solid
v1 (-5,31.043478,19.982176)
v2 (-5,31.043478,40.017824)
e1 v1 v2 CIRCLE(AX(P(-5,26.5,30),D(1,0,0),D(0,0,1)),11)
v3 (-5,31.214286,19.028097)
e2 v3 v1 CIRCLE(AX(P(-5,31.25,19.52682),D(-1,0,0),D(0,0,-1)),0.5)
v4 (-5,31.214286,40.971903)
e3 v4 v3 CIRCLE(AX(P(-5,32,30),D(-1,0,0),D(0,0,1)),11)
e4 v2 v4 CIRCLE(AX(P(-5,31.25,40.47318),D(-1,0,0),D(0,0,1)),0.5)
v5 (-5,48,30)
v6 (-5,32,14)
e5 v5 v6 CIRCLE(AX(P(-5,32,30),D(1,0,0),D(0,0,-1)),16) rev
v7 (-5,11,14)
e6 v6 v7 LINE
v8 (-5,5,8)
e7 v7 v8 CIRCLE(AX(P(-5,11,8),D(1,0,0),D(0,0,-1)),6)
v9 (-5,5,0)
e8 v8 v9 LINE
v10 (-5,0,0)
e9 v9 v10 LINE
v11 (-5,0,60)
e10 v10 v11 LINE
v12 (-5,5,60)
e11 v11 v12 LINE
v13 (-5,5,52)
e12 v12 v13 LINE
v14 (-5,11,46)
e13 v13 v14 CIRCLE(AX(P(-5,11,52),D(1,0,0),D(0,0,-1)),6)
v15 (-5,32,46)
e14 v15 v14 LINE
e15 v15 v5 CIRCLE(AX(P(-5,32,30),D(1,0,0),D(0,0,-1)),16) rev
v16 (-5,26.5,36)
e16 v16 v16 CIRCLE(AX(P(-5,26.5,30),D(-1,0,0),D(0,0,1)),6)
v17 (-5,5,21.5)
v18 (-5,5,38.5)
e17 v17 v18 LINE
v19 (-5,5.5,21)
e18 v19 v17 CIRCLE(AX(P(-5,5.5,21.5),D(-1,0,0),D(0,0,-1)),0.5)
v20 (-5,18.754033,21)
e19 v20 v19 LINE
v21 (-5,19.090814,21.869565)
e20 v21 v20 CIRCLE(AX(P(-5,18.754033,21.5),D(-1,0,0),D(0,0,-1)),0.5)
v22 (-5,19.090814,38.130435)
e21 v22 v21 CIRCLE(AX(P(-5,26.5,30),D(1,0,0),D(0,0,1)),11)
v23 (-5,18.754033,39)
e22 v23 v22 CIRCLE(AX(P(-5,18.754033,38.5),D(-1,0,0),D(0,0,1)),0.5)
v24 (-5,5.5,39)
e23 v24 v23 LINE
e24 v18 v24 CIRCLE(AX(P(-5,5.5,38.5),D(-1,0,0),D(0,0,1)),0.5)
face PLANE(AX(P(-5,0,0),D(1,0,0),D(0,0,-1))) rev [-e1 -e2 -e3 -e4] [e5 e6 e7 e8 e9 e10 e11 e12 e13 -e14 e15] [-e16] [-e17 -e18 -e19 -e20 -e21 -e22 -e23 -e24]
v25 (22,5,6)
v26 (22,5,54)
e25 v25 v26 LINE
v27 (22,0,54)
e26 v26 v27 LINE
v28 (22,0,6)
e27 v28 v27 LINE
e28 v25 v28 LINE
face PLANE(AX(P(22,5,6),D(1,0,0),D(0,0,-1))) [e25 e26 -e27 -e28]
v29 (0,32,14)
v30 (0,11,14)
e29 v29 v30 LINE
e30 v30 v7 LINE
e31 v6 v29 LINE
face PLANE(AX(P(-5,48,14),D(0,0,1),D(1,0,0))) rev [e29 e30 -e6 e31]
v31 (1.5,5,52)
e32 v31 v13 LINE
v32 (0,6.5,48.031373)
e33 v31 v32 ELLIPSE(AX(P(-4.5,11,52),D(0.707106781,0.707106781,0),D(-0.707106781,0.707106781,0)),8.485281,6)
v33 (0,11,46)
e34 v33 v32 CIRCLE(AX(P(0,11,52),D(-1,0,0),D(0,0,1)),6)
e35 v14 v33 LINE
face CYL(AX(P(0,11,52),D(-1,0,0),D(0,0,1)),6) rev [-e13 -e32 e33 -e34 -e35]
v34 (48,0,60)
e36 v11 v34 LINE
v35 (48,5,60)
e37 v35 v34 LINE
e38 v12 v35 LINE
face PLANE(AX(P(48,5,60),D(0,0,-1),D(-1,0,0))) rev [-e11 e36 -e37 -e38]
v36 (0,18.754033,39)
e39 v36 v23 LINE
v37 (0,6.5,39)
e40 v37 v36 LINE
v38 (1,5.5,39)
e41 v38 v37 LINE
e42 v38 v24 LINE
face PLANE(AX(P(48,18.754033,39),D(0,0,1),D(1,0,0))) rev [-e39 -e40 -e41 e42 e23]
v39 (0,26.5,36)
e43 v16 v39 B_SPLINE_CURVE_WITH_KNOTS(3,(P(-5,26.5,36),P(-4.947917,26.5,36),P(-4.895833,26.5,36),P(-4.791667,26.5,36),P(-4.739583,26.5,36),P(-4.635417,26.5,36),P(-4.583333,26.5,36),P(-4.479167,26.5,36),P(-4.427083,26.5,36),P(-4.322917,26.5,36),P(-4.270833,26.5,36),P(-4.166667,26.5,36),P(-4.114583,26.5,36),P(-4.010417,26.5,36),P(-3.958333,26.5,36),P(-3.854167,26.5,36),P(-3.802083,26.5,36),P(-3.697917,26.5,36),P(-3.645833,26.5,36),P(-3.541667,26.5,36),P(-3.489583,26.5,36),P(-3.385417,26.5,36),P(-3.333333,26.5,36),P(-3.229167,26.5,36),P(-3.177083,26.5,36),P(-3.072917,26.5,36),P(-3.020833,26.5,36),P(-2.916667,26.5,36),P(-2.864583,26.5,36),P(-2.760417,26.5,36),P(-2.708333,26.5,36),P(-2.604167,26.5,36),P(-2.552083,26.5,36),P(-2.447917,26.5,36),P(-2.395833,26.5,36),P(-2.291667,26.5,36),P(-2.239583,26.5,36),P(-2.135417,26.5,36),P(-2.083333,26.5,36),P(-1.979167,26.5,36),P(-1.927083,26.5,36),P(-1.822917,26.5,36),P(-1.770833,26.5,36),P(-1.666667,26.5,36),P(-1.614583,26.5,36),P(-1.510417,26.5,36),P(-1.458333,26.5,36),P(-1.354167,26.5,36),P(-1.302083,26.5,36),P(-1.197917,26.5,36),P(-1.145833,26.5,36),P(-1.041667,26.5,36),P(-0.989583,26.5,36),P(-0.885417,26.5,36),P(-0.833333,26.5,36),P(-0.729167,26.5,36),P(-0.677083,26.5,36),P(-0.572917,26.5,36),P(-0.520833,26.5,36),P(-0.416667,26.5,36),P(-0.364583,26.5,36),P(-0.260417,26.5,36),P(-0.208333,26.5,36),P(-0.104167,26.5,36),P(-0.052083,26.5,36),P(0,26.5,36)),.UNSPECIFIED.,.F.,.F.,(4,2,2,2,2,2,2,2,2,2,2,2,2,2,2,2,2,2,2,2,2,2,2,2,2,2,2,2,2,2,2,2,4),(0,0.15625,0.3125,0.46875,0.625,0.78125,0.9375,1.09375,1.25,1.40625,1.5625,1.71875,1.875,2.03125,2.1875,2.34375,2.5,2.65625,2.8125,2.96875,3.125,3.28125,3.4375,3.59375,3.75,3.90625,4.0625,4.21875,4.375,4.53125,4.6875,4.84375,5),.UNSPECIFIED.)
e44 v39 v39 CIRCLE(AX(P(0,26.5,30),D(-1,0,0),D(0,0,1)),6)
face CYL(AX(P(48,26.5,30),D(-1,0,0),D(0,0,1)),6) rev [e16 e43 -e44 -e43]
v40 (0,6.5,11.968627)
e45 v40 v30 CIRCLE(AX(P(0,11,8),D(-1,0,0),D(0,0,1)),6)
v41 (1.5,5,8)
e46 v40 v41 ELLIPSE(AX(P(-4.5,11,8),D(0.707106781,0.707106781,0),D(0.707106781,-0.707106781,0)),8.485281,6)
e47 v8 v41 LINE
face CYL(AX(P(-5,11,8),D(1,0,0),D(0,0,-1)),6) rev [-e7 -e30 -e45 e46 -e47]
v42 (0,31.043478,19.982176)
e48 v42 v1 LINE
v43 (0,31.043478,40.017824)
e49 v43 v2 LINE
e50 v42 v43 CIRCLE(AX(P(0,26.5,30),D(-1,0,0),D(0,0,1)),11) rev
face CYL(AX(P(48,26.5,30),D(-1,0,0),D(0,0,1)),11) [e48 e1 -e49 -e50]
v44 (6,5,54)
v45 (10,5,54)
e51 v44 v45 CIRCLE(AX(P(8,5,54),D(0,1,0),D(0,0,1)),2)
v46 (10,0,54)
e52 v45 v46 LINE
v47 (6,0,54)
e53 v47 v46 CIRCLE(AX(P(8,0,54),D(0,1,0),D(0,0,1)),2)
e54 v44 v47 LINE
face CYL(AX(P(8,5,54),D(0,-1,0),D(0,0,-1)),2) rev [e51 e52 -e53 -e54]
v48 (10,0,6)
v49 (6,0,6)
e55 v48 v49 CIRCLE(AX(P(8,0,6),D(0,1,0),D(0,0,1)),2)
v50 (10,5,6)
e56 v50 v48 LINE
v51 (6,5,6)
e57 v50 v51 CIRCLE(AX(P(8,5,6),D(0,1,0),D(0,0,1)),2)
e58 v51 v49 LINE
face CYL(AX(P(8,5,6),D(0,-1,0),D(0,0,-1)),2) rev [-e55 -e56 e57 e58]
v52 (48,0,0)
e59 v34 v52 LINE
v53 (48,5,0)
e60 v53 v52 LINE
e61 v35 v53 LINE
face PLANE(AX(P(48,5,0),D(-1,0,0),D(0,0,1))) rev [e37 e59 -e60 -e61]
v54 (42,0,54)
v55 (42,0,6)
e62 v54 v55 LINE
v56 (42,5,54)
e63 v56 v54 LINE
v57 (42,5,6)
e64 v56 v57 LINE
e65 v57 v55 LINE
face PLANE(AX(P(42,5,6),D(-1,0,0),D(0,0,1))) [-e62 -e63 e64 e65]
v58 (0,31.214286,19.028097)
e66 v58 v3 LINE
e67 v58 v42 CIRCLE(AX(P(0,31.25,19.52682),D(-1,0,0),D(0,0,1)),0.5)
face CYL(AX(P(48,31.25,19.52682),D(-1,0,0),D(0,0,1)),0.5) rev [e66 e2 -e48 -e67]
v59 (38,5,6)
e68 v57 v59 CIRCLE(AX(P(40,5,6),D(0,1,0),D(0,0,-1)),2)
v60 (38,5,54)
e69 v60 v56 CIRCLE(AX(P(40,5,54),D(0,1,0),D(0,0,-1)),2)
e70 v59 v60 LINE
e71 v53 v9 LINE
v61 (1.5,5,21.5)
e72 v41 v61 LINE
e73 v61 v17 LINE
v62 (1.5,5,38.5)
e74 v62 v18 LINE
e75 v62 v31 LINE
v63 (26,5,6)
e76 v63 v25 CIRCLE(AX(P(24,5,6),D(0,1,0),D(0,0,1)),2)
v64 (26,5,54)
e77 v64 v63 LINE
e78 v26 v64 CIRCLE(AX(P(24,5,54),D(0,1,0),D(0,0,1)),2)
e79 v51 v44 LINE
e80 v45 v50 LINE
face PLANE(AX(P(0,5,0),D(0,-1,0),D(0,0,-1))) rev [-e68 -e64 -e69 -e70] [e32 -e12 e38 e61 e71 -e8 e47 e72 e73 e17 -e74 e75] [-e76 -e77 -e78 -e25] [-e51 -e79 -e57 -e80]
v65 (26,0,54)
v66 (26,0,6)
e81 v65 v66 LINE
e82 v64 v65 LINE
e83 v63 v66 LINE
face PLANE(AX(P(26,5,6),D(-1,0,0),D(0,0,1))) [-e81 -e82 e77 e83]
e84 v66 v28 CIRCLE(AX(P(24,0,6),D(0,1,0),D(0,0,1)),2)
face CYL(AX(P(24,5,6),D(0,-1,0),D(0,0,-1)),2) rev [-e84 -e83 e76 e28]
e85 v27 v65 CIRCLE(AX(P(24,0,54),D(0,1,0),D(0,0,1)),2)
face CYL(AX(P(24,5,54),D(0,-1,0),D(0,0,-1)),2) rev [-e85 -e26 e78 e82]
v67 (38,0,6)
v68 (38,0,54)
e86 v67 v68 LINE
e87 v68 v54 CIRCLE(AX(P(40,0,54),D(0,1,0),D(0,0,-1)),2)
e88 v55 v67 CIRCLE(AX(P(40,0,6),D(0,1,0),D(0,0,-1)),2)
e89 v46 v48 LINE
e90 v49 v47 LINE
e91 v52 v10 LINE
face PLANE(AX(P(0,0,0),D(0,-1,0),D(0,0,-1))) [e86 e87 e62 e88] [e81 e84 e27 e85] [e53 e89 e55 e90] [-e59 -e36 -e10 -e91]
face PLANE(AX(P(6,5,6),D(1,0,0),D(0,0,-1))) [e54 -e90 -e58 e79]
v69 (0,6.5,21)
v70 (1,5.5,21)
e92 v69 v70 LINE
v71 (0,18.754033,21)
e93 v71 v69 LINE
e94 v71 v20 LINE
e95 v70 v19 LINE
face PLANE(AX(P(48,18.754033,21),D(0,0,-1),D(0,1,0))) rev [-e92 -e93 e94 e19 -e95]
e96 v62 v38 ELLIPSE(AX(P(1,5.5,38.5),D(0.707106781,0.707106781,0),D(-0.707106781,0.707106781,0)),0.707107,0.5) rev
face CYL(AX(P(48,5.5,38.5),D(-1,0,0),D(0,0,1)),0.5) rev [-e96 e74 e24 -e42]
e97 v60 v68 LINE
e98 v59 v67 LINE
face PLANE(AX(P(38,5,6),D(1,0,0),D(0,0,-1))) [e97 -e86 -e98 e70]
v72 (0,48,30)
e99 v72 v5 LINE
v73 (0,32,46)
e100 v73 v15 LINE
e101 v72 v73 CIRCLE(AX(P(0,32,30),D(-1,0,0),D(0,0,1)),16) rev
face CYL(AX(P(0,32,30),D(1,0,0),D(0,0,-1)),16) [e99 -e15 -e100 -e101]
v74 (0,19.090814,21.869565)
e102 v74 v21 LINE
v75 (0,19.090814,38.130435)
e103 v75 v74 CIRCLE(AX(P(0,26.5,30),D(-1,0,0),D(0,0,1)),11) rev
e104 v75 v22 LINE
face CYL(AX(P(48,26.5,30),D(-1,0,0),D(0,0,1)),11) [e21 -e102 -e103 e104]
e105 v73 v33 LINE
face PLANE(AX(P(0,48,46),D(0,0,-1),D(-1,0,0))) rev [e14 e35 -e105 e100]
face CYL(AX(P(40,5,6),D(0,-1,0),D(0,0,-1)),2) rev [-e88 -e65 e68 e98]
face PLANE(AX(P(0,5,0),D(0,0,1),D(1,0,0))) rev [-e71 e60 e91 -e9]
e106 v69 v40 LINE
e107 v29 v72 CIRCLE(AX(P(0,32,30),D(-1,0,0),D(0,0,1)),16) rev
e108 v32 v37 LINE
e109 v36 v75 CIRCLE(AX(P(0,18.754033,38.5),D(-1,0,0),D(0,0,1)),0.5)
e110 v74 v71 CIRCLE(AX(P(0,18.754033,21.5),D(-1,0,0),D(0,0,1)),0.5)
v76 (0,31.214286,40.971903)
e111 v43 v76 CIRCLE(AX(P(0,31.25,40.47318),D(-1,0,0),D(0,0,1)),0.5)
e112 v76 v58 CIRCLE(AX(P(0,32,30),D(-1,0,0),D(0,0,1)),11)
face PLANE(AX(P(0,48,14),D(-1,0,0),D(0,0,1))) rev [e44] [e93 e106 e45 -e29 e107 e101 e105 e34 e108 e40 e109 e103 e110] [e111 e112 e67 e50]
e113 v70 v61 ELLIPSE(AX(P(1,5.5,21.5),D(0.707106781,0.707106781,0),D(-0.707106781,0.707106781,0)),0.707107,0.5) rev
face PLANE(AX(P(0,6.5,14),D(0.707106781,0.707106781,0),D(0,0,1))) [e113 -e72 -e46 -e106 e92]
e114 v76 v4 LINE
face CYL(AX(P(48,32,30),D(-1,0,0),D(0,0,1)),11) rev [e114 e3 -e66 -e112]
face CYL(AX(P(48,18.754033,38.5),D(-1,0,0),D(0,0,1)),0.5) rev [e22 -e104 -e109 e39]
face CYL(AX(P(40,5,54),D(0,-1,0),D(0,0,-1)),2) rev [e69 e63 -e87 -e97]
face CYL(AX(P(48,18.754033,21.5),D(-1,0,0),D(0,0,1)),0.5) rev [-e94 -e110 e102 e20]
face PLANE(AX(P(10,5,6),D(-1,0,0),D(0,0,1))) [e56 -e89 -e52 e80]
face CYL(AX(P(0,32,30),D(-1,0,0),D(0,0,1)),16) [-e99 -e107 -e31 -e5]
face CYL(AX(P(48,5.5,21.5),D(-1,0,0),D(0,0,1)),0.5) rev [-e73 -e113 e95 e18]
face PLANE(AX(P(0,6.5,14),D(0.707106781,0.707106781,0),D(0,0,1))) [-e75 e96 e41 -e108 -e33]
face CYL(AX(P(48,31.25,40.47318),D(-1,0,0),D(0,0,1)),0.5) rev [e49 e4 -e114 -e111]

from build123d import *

# Parameters (mm, degrees)
SKETCH1_W           = 48
SKETCH1_H           = 60
BOSS_EXTRUDE1_DEPTH = 5
SKETCH2_W           = 60
SKETCH2_H           = 5
BOSS_EXTRUDE2_DEPTH = 5
SKETCH4_W           = 5
SKETCH4_H           = 32
BOSS_EXTRUDE3_DEPTH = 43
FILLET2_R           = 6
CHAMFER1_SIZE       = 1.5
SKETCH6_R           = 6
CUT_EXTRUDE1_DEPTH  = 94.343451832
FILLET3_R           = 16
CUT_EXTRUDE2_DEPTH  = 94.343451832


with BuildPart() as part:
    # Sketch1 → Boss-Extrude1 (new body)
    with BuildSketch(Plane(origin=(0, 0, 0), x_dir=(1, 0, 0), z_dir=(0, 1, 0))):
        with Locations((24, -30)):
            Rectangle(SKETCH1_W, SKETCH1_H)
        with BuildLine():
            Line((10, -6), (10, -54))
            ThreePointArc((10, -54), (8, -56), (6, -54))
            Line((6, -54), (6, -6))
            ThreePointArc((6, -6), (8, -4), (10, -6))
        make_face(mode=Mode.SUBTRACT)
        with BuildLine():
            Line((38, -6), (38, -54))
            ThreePointArc((38, -54), (40, -56), (42, -54))
            Line((42, -54), (42, -6))
            ThreePointArc((42, -6), (40, -4), (38, -6))
        make_face(mode=Mode.SUBTRACT)
        with BuildLine():
            Line((26, -6), (26, -54))
            ThreePointArc((26, -54), (24, -56), (22, -54))
            Line((22, -54), (22, -6))
            ThreePointArc((22, -6), (24, -4), (26, -6))
        make_face(mode=Mode.SUBTRACT)
    extrude(amount=BOSS_EXTRUDE1_DEPTH)

    # Sketch2 → Boss-Extrude2 (add)
    with BuildSketch(Plane.ZY):
        with Locations((30, 2.5)):
            Rectangle(SKETCH2_W, SKETCH2_H)
    extrude(amount=BOSS_EXTRUDE2_DEPTH)

    # Sketch4 → Boss-Extrude3 (add)
    with BuildSketch(Plane(origin=(0, 5, 0), x_dir=(1, 0, 0), z_dir=(0, 1, 0))):
        with Locations((-2.5, -30)):
            Rectangle(SKETCH4_W, SKETCH4_H)
    extrude(amount=BOSS_EXTRUDE3_DEPTH)

    # Fillet2
    fillet2_edges = [part.edges().sort_by_distance(p)[0] for p in [
        (-2.5, 5, 46),
        (-2.5, 5, 14),
    ]]
    fillet(fillet2_edges, radius=FILLET2_R)

    # Chamfer1
    chamfer1_edges = [part.edges().sort_by_distance(p)[0] for p in [
        (0, 5, 30),
    ]]
    chamfer(chamfer1_edges, length=CHAMFER1_SIZE)

    # Sketch6 → Cut-Extrude1 (cut, through all)
    with BuildSketch(Plane.ZY.offset(5)):
        with Locations((30, 26.5)):
            Circle(SKETCH6_R)
    extrude(amount=-CUT_EXTRUDE1_DEPTH, mode=Mode.SUBTRACT)

    # Fillet3
    fillet3_edges = [part.edges().sort_by_distance(p)[0] for p in [
        (-2.5, 48, 46),
        (-2.5, 48, 14),
    ]]
    fillet(fillet3_edges, radius=FILLET3_R - 0.0001)  # a hair under: the kernel refuses the full size

    # Sketch7 → Cut-Extrude2 (cut, through all)
    with BuildSketch(Plane.ZY.offset(5)):
        with BuildLine():
            Line((21, 18.754033308), (21, 5.5))
            ThreePointArc((21, 5.5), (21.146446609, 5.146446609), (21.5, 5))
            Line((21.5, 5), (38.5, 5))
            ThreePointArc((38.5, 5), (38.853553391, 5.146446609), (39, 5.5))
            Line((39, 5.5), (39, 18.754033308))
            ThreePointArc((39, 18.754033308), (38.68057878, 19.220285712), (38.130434783, 19.090814468))
            ThreePointArc((38.130434783, 19.090814468), (30, 15.5), (21.869565217, 19.090814468))
            ThreePointArc((21.869565217, 19.090814468), (21.31942122, 19.220285712), (21, 18.754033308))
        make_face()
        with BuildLine():
            ThreePointArc((40.971902892, 31.214285714), (30, 43), (19.028097108, 31.214285714))
            ThreePointArc((19.028097108, 31.214285714), (19.438706545, 30.757825209), (19.982175621, 31.043478261))
            ThreePointArc((19.982175621, 31.043478261), (30, 37.5), (40.017824379, 31.043478261))
            ThreePointArc((40.017824379, 31.043478261), (40.561293455, 30.757825209), (40.971902892, 31.214285714))
        make_face()
    extrude(amount=-CUT_EXTRUDE2_DEPTH, mode=Mode.SUBTRACT)


solid = part.part
